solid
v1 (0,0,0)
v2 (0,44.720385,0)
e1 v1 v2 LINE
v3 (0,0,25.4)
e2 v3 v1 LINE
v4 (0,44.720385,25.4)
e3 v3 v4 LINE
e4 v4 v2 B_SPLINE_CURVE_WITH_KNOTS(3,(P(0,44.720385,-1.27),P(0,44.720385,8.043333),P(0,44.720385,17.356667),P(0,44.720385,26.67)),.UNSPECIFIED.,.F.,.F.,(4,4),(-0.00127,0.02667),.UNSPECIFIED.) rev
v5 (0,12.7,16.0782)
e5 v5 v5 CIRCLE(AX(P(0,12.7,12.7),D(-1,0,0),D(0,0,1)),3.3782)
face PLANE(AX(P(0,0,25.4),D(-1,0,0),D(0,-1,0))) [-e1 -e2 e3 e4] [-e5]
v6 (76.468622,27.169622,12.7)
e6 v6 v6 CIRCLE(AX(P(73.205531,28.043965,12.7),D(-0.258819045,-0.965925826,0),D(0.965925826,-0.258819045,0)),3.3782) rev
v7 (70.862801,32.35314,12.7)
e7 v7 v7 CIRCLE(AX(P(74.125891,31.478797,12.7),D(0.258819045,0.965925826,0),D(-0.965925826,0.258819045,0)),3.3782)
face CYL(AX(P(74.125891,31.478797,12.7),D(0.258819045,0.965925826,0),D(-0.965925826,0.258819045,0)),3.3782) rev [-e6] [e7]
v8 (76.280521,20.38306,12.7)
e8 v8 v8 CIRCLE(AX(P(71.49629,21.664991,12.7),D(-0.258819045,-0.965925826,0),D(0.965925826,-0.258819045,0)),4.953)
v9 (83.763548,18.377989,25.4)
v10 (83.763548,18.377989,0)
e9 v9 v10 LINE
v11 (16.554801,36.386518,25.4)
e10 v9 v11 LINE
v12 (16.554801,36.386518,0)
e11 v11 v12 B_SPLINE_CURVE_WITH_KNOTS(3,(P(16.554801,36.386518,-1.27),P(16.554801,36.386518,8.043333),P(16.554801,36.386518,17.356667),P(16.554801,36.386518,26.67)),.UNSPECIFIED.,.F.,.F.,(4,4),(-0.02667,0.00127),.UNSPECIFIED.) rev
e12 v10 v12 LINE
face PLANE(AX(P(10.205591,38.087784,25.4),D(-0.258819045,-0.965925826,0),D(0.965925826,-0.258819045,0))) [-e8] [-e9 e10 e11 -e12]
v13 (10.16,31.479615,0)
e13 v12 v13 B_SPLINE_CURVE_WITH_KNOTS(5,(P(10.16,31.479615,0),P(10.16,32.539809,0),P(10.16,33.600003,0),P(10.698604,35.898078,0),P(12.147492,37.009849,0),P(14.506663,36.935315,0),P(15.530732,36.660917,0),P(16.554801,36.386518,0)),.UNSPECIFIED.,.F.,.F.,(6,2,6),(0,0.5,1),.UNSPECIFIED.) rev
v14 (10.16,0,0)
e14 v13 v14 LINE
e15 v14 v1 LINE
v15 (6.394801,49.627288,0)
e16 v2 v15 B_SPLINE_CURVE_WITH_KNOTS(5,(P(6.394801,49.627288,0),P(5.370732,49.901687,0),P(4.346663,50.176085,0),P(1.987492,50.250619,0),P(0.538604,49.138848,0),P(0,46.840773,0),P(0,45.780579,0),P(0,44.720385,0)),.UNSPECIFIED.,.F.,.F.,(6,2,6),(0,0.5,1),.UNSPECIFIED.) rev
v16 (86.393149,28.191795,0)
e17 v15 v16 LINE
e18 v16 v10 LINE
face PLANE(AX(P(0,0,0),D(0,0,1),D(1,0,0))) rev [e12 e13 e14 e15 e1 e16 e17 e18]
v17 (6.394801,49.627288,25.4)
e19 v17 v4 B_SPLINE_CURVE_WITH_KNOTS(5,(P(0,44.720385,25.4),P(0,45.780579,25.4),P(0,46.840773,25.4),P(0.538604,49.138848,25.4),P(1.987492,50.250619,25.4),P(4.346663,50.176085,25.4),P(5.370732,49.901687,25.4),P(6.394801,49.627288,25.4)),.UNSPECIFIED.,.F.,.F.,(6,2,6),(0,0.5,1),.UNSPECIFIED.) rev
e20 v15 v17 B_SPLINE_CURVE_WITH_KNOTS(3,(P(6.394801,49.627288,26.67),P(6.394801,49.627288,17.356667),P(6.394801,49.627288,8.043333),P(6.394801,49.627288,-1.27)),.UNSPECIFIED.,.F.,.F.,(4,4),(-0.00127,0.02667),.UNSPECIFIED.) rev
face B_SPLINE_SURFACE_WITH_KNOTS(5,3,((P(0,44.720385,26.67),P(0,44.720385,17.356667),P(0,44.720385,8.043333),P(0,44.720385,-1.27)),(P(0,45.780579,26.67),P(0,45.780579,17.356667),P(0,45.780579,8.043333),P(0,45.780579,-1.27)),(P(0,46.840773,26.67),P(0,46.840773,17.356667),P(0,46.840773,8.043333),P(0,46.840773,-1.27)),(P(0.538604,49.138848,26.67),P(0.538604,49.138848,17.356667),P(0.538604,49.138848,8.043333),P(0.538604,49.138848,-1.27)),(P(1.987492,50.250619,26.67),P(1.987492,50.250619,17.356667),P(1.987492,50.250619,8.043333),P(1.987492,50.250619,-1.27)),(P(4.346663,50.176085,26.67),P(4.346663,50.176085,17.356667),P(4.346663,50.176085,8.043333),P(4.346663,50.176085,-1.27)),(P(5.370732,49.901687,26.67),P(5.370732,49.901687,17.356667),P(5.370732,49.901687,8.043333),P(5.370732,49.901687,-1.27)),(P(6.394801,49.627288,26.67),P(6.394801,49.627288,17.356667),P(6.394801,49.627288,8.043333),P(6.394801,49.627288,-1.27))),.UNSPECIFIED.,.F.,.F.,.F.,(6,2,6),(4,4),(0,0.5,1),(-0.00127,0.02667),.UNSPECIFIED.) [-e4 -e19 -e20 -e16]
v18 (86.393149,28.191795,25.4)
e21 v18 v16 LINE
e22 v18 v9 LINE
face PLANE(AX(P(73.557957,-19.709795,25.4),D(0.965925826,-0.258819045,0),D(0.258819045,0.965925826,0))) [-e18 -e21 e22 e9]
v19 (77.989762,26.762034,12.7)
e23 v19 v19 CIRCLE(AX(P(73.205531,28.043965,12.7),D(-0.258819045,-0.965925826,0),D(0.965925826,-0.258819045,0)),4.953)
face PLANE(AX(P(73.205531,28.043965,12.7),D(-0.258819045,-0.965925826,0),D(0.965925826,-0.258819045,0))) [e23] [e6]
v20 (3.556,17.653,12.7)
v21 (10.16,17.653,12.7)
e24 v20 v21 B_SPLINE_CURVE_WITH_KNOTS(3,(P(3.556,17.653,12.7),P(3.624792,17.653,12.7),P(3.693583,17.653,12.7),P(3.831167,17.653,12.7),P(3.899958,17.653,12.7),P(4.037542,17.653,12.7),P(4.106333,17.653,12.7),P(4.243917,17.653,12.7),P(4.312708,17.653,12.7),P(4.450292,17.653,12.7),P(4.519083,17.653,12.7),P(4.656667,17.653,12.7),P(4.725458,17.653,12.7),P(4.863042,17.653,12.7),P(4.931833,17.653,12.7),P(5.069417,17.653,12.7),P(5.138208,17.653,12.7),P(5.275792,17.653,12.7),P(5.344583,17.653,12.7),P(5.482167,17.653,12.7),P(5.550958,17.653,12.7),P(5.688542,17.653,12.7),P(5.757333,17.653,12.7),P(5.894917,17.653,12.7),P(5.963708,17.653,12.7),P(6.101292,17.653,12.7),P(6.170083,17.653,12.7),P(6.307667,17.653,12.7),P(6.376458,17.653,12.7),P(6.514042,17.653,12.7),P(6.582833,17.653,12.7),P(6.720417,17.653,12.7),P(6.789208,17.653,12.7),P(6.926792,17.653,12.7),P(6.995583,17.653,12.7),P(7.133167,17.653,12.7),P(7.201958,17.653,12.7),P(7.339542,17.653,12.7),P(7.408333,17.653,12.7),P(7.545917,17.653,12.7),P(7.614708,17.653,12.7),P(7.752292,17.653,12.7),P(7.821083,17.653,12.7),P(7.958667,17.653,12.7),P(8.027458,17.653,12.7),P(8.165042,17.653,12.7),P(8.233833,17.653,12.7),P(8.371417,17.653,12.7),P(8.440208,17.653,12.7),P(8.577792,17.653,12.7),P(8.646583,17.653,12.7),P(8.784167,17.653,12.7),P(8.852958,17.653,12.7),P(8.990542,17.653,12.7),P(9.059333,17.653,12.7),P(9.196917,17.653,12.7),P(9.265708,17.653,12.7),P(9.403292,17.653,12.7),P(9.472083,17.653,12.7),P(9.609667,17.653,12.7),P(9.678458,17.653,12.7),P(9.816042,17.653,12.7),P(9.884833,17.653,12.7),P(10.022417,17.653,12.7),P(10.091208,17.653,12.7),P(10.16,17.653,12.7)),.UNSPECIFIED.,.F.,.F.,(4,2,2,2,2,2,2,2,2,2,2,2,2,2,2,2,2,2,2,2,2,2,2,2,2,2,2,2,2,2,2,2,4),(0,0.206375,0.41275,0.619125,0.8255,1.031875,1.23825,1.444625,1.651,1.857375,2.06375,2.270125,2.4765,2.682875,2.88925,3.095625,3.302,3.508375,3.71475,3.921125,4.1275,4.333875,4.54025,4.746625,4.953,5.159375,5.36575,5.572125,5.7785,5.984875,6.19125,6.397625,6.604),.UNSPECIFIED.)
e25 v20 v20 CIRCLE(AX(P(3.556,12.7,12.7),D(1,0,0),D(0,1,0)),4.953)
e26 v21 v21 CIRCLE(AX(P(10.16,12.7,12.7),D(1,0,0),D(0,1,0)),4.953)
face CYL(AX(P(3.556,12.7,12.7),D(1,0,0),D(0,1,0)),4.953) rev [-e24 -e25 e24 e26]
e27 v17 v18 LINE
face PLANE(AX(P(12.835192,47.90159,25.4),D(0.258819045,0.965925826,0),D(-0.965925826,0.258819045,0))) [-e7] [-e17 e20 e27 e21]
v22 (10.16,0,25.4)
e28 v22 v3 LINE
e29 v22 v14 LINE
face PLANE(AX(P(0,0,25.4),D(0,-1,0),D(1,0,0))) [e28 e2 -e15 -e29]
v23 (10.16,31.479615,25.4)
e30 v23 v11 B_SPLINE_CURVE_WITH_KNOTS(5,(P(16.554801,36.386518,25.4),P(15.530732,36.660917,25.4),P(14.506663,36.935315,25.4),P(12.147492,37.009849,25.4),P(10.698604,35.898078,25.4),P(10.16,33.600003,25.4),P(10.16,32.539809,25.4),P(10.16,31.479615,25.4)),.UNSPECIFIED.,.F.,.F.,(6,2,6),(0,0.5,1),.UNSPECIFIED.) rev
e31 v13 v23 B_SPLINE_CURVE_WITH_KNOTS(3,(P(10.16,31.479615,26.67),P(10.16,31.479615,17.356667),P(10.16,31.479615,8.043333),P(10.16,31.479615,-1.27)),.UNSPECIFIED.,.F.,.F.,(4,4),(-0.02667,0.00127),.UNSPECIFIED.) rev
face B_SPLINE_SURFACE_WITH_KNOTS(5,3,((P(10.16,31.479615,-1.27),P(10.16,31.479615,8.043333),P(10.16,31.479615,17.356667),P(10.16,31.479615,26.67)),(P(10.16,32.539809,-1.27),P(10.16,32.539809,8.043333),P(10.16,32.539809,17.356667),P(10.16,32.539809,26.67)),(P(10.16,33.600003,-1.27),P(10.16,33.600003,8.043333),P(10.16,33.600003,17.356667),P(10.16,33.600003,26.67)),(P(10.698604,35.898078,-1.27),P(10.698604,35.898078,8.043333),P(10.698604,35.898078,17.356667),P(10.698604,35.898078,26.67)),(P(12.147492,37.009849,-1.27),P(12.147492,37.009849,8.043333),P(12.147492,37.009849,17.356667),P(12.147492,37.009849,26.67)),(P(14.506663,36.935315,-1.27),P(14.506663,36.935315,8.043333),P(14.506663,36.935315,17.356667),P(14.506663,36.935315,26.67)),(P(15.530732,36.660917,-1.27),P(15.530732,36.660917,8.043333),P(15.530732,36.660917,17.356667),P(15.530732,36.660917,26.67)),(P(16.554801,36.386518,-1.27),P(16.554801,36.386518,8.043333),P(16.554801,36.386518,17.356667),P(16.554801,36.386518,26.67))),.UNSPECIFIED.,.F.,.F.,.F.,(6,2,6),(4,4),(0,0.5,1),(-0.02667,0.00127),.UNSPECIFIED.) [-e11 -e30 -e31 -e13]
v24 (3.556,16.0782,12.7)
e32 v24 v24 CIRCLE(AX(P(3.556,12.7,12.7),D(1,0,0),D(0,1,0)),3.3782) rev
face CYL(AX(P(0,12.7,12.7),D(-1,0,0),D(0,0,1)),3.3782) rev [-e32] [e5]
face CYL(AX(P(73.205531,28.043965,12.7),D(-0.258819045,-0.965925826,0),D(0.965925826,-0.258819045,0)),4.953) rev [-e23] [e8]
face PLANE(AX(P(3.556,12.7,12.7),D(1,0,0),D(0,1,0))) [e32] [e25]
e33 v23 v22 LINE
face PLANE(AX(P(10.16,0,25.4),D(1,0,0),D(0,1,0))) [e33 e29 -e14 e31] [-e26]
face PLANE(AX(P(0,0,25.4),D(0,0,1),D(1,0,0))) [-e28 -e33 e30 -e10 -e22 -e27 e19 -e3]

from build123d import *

# Parameters (mm, degrees)
BOSS_EXTRUDE1_DEPTH         = 25.4
F_1_4_CLEARANCE_HOLE1_D     = 6.7564
F_1_4_CLEARANCE_HOLE1_DEPTH = 10.16
F_1_4_CLEARANCE_HOLE1_TIP   = 2.029827343
F_1_4_CLEARANCE_HOLE2_D     = 6.7564
F_1_4_CLEARANCE_HOLE2_DEPTH = 10.16
F_1_4_CLEARANCE_HOLE2_TIP   = 2.029827343
SKETCH8_R                   = 4.953
CUT_EXTRUDE1_DEPTH          = 6.604
SKETCH9_R                   = 4.953
CUT_EXTRUDE2_DEPTH          = 6.604


with BuildPart() as part:
    # Sketch1 → Boss-Extrude1 (new body)
    with BuildSketch(Plane.XY):
        Polygon((10.16, 0), (0, 0), (0, 51.340769788), (86.393149461, 28.191795158), (83.763547963, 18.377988763), (10.16, 38.1), align=None)
    extrude(amount=BOSS_EXTRUDE1_DEPTH)

    # 1/4 Clearance Hole1
    with Locations(Plane.ZY):
        with Locations((12.7, 12.7)):
            Hole(F_1_4_CLEARANCE_HOLE1_D / 2, depth=F_1_4_CLEARANCE_HOLE1_DEPTH)
            with Locations((0, 0, -(F_1_4_CLEARANCE_HOLE1_DEPTH + F_1_4_CLEARANCE_HOLE1_TIP / 2))):  # 118° drill point
                Cone(0, F_1_4_CLEARANCE_HOLE1_D / 2, F_1_4_CLEARANCE_HOLE1_TIP, mode=Mode.SUBTRACT)

    # 1/4 Clearance Hole2
    with Locations(Plane(origin=(12.835192447, 47.901590337, 0), x_dir=(0.9659258262890674, -0.2588190451025242, 0), z_dir=(0.2588190451025242, 0.9659258262890674, 0))):
        with Locations((63.452800777, -12.7)):
            Hole(F_1_4_CLEARANCE_HOLE2_D / 2, depth=F_1_4_CLEARANCE_HOLE2_DEPTH)
            with Locations((0, 0, -(F_1_4_CLEARANCE_HOLE2_DEPTH + F_1_4_CLEARANCE_HOLE2_TIP / 2))):  # 118° drill point
                Cone(0, F_1_4_CLEARANCE_HOLE2_D / 2, F_1_4_CLEARANCE_HOLE2_TIP, mode=Mode.SUBTRACT)

    # Fillet1
    # a fillet whose section is not a circle: 5.08 mm, written as the material it adds along each edge (its section moved 0.00015 mm through the faces so that the kernel can cut it)
    with BuildSketch(Plane(origin=(10.16, 38.1, 0), x_dir=(0.9659316901800618, -0.25879715977168133, 0), z_dir=(0, 0, 1))) as fillet1_piece_1:
        with BuildLine():
            add(Edge.make_bspline([(6.620384896, 0), (5.560159502, 2.4022e-05), (4.499934108, 4.8044e-05), (2.201778974, -0.538520049), (1.089942696, -1.987425322), (1.164425276, -4.346667776), (1.438808597, -5.370773083), (1.713191917, -6.39487839)], knots=[0, 0, 0, 0, 0, 0, 0.5, 0.5, 1, 1, 1, 1, 1, 1], degree=5))
            Line((1.713191917, -6.39487839), (1.615053258, -6.421172181))
            ThreePointArc((1.615053258, -6.421172181), (0.758529744, -3.223713577), (-0.09813866, -0.026293791))
            Line((-0.09813866, -0.026293791), (2.302e-06, 0.1016))
            ThreePointArc((2.302e-06, 0.1016), (3.310194748, 0.101525), (6.620387198, 0.1016))
            Line((6.620387198, 0.1016), (6.620384896, 0))
        make_face()
    extrude(amount=25.4)
    # a fillet whose section is not a circle: 5.08 mm, written as the material it takes off along each edge (its section moved 0.00015 mm through the faces so that the kernel can cut it)
    with BuildSketch(Plane(origin=(0, 51.340769788, -16.550962239), x_dir=(-2.2657292946318672e-05, -0.9999999997433235, 0), z_dir=(0, 0, 1))) as fillet1_2_piece_1:
        with BuildLine():
            add(Edge.make_bspline([(6.620384896, 0), (5.560159502, -2.4022e-05), (4.499934108, -4.8044e-05), (2.201778974, 0.538520049), (1.089942696, 1.987425322), (1.164425276, 4.346667776), (1.438808597, 5.370773083), (1.713191917, 6.39487839)], knots=[0, 0, 0, 0, 0, 0, 0.5, 0.5, 1, 1, 1, 1, 1, 1], degree=5))
            Line((1.713191917, 6.39487839), (1.615053258, 6.421172181))
            ThreePointArc((1.615053258, 6.421172181), (0.758529744, 3.223713577), (-0.09813866, 0.026293791))
            Line((-0.09813866, 0.026293791), (2.302e-06, -0.1016))
            ThreePointArc((2.302e-06, -0.1016), (3.310194748, -0.101525), (6.620387198, -0.1016))
            Line((6.620387198, -0.1016), (6.620384896, 0))
        make_face()
    extrude(amount=58.501924479, mode=Mode.SUBTRACT)

    # Sketch8 → Cut-Extrude1 (cut)
    with BuildSketch(Plane(origin=(10.205590949, 38.087783942, 0), x_dir=(0.9659258262890673, -0.2588190451025246, 0), z_dir=(-0.2588190451025246, -0.9659258262890674, 0))):
        with Locations((63.452800777, 12.7)):
            Circle(SKETCH8_R)
    extrude(amount=-CUT_EXTRUDE1_DEPTH, mode=Mode.SUBTRACT)

    # Sketch9 → Cut-Extrude2 (cut)
    with BuildSketch(Plane(origin=(10.16, 0, 0), x_dir=(0, 0, -1), z_dir=(1, 0, 0))):
        with Locations(Location((-12.7, 12.7, 0), (0, 0, 90))):
            Circle(SKETCH9_R)
    extrude(amount=-CUT_EXTRUDE2_DEPTH, mode=Mode.SUBTRACT)


solid = part.part
